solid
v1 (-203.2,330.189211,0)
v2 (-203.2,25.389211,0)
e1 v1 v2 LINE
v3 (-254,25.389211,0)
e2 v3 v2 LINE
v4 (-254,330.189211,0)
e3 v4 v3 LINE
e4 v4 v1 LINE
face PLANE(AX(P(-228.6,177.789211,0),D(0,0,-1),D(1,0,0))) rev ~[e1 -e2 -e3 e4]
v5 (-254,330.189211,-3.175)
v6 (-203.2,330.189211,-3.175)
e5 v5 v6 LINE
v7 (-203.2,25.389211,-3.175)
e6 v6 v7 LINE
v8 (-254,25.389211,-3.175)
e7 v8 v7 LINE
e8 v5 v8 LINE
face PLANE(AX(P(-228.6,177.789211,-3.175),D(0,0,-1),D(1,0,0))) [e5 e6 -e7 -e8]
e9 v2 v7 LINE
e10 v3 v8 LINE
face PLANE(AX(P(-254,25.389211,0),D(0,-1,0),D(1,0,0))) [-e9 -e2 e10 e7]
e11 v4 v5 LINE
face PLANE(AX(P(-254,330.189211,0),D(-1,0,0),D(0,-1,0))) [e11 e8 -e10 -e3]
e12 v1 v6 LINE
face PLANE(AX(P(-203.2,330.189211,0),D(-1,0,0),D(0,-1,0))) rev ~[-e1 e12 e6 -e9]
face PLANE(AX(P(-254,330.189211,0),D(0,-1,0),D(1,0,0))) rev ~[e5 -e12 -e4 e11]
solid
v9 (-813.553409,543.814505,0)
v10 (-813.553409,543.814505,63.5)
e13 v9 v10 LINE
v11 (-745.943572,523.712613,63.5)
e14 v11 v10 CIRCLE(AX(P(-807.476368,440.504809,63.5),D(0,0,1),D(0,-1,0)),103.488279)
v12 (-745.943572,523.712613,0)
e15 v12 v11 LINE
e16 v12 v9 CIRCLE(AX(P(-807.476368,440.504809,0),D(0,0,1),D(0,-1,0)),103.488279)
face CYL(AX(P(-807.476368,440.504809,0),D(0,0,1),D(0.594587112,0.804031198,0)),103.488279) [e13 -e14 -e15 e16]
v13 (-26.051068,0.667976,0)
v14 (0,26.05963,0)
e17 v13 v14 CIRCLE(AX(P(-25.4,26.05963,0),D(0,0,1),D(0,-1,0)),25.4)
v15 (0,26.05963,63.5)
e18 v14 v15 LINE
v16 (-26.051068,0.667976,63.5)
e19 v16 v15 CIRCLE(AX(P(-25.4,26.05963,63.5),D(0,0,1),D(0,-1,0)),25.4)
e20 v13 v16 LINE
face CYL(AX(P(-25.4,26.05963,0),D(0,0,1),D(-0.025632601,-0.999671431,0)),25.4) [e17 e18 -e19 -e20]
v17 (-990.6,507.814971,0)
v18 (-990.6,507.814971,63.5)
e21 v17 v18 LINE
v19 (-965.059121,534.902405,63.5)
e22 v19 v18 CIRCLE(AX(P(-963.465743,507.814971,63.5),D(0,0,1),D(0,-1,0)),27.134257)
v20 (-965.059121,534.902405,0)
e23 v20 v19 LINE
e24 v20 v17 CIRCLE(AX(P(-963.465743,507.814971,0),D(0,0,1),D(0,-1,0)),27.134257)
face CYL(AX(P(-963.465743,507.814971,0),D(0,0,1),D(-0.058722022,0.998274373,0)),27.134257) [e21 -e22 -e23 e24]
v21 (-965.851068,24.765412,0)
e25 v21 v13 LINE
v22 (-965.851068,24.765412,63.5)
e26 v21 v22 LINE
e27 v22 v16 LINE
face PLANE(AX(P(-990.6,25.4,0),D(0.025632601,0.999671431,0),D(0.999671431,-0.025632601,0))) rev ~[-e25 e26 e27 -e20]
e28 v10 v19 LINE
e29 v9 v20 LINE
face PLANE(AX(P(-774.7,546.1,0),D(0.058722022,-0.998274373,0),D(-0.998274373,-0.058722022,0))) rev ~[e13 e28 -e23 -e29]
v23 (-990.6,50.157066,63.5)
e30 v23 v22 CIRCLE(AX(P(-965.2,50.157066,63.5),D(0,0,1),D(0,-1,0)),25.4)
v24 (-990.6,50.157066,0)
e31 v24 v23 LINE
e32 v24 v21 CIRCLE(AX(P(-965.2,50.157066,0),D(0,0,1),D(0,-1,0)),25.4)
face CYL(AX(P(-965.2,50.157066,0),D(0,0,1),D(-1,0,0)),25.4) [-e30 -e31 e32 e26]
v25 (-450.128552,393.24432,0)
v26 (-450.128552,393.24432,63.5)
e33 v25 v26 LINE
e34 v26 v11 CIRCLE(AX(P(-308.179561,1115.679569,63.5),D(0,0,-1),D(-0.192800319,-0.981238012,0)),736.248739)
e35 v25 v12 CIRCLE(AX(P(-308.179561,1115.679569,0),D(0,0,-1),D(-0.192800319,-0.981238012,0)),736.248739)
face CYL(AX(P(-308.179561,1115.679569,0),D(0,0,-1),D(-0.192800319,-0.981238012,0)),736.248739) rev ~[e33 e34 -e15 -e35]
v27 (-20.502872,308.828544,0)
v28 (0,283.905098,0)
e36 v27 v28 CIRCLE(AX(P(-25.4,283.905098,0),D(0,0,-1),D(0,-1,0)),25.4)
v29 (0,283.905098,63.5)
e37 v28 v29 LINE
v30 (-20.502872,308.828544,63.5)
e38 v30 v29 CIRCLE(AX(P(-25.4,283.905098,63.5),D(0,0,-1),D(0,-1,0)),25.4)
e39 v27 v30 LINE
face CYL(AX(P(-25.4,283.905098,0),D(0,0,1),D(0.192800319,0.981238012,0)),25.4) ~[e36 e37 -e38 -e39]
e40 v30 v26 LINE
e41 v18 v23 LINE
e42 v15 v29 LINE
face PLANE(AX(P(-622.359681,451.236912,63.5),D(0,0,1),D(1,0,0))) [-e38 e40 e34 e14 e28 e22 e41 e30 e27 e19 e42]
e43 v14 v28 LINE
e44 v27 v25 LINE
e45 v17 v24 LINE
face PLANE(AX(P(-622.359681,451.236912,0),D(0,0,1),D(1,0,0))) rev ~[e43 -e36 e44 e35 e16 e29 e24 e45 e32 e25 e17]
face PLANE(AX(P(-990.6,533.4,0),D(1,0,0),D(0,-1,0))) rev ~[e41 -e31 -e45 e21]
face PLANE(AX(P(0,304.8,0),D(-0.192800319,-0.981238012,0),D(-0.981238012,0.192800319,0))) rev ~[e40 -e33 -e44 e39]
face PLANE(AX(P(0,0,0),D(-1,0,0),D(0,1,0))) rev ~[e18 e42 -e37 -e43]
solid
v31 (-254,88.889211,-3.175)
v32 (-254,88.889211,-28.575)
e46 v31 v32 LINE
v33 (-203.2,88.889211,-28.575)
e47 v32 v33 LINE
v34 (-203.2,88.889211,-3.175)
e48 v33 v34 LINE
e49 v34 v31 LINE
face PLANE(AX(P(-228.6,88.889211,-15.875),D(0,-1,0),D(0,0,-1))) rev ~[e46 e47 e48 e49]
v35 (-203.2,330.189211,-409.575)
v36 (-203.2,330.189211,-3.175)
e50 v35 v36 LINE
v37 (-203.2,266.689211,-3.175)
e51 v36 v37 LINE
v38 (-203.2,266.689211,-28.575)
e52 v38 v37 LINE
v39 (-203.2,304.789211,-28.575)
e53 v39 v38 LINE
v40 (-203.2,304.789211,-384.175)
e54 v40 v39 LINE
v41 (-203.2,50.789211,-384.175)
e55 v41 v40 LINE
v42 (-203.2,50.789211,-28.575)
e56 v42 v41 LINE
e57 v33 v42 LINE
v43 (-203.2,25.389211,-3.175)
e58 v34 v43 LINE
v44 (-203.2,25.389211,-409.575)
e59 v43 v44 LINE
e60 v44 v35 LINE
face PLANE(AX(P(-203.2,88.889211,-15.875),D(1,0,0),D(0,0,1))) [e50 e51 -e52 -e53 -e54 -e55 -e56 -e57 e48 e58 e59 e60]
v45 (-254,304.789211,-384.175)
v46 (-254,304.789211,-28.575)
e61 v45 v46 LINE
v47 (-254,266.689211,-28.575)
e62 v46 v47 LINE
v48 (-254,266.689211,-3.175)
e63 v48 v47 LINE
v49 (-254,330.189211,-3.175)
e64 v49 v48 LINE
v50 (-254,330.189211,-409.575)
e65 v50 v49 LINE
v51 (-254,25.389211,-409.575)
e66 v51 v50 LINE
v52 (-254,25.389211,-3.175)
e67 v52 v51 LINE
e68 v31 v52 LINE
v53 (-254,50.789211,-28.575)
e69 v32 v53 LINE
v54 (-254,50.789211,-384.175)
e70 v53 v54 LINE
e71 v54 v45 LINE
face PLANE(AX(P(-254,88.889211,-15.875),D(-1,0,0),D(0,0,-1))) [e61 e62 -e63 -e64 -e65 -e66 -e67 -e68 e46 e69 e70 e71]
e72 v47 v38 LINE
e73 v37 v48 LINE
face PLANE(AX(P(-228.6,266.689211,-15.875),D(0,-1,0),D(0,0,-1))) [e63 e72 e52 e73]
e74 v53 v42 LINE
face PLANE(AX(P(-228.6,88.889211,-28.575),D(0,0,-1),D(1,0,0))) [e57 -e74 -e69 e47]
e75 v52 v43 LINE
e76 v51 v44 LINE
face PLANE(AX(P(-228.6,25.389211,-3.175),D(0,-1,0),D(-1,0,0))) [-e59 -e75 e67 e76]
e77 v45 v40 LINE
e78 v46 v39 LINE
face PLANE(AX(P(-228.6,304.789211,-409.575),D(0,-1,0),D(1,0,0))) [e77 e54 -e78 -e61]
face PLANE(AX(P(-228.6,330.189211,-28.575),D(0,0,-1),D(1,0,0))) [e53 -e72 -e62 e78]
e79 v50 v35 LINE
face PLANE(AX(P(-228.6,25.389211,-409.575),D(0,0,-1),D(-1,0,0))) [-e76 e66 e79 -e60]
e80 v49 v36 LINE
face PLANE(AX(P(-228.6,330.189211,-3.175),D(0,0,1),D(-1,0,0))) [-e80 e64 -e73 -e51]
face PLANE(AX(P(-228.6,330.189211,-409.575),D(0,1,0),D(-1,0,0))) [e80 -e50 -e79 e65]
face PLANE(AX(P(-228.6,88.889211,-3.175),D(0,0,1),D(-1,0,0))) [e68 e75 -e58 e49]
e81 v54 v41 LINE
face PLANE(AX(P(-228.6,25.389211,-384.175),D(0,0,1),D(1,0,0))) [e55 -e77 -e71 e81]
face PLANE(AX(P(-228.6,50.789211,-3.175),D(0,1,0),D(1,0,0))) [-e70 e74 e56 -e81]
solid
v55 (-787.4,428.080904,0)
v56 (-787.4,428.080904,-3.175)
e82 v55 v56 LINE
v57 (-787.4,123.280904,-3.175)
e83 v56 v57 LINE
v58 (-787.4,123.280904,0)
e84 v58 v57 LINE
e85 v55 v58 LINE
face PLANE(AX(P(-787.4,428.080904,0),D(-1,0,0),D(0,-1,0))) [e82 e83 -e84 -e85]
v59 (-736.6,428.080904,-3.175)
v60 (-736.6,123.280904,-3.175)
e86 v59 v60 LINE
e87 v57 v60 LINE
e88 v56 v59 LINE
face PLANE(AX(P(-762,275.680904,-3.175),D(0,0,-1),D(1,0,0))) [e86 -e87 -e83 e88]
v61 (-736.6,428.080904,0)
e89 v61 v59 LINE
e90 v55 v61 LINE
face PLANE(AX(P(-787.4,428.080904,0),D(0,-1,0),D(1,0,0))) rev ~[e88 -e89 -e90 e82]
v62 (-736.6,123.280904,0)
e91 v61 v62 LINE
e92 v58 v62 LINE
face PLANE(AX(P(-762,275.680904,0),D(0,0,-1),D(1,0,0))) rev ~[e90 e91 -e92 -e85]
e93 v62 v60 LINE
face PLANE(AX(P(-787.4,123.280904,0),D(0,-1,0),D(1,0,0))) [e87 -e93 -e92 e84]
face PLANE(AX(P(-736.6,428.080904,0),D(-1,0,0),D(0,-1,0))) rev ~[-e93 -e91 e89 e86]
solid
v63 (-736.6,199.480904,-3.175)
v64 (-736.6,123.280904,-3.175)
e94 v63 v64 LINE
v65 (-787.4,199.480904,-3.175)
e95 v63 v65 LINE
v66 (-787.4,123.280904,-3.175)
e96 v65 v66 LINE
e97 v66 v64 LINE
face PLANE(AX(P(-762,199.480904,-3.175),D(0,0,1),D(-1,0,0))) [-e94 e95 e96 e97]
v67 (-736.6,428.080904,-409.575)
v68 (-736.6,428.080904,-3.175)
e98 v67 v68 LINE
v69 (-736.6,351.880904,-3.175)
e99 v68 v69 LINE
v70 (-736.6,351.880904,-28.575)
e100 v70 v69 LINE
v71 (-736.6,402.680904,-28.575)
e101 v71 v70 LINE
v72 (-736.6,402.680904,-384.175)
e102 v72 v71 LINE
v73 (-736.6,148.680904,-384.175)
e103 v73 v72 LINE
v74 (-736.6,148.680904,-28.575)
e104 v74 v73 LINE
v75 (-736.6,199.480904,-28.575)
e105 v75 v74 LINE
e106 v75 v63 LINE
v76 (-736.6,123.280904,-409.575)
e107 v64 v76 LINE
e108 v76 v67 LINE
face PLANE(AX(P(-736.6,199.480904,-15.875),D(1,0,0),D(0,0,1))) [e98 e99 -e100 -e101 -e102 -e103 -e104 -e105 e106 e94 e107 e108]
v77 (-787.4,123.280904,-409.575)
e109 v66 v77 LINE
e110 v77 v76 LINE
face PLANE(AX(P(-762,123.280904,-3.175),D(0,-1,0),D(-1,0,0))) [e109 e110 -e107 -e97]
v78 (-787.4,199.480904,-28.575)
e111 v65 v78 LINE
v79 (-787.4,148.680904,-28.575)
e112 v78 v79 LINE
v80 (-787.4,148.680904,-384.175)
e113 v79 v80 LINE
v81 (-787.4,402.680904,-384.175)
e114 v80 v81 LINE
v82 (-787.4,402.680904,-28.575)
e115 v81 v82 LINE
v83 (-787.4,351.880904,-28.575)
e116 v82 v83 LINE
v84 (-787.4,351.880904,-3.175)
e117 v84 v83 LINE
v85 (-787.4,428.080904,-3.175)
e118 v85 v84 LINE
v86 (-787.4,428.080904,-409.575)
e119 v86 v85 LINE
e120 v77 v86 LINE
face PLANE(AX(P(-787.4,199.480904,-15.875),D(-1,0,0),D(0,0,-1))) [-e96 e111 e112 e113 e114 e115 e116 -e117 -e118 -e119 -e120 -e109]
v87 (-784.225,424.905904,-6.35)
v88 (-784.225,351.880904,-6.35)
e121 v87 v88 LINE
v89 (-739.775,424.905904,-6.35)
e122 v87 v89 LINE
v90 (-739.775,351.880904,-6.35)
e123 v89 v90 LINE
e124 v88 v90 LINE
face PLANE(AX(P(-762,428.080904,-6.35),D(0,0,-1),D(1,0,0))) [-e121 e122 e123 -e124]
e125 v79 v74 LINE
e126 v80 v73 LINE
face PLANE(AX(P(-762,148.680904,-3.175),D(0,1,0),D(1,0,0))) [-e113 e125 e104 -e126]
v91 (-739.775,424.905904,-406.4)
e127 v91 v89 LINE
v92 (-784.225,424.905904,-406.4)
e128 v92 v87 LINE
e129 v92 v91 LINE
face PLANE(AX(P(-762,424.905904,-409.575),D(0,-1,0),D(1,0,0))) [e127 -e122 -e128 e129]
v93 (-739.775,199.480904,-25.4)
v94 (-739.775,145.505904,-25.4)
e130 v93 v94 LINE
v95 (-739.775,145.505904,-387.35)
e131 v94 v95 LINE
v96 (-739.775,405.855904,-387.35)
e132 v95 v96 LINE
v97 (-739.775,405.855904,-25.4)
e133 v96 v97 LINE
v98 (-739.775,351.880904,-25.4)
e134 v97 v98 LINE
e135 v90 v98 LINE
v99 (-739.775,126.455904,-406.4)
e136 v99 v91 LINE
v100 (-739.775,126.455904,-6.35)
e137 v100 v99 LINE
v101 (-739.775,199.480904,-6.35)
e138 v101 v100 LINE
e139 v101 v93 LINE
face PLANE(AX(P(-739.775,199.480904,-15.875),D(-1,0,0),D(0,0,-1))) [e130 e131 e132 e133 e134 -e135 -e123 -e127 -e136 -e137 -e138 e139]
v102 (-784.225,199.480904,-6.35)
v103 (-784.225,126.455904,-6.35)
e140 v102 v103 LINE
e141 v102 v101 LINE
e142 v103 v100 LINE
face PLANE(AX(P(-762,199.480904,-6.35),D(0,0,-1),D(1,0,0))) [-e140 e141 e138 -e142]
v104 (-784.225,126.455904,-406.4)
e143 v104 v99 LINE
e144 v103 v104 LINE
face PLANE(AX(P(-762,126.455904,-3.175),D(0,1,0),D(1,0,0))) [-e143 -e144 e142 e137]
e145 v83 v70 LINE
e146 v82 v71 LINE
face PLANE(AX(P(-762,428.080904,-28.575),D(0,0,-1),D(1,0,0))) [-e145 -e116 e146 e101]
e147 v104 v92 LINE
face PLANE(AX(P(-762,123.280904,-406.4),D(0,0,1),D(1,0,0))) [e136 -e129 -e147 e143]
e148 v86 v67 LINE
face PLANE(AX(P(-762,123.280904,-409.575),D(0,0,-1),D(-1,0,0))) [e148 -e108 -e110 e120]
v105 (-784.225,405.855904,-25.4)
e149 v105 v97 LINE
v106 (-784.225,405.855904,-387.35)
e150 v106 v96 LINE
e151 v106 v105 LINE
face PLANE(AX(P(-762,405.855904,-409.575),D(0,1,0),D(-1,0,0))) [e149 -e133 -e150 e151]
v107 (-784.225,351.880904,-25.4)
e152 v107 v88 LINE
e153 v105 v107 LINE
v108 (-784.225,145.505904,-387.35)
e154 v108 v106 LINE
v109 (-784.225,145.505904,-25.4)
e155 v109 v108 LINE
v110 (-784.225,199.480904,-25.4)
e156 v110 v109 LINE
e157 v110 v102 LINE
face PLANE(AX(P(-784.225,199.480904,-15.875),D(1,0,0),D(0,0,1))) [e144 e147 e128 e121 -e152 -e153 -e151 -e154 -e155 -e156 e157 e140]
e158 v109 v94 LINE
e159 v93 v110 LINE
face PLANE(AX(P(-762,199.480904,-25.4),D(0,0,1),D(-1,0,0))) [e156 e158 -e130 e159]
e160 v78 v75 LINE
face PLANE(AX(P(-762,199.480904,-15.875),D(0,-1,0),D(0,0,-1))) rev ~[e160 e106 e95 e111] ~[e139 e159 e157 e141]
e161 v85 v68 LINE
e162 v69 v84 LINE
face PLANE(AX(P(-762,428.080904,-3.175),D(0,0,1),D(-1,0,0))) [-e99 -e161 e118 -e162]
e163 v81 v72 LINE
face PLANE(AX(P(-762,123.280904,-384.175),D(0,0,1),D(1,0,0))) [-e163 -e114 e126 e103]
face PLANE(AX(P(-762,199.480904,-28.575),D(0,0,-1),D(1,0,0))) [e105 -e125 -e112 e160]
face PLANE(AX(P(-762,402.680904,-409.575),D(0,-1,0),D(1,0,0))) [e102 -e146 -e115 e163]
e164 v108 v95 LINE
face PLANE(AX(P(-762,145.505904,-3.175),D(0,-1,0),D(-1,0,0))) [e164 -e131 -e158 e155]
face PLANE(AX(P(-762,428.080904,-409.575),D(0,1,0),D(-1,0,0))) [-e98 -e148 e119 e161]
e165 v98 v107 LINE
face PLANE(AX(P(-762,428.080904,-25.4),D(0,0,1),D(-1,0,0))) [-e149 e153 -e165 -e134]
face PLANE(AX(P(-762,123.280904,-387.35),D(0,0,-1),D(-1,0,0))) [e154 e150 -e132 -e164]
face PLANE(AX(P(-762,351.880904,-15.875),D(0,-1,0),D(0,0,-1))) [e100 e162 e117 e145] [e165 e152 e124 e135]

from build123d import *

# Parameters (mm, degrees)
F1_DEPTH    = 63.5
F3_T1_DEPTH = 63.5
F2_W        = 50.8
F2_H        = 304.8
F4_DEPTH    = 3.175
F7_W        = 50.8
F7_H        = 25.4
F7_W_2      = 44.45
F7_H_2      = 19.05
F11_W       = 50.8
F11_H       = 25.4
F13_R       = 103.4882786099
F14_R       = 27.1342571694
F15_R       = 25.4


# Not quite as in the source:
# - a fillet or chamfer that OpenCascade refuses, or shapes differently, is made with other operations: its cross-section is extruded or revolved along the edge and cut away or added


with BuildPart() as f1:
    # F0 (on Top) → F1 (new body)
    with BuildSketch(Plane.XY):
        Polygon((-990.6, 25.4), (0, 0), (0, 304.8), (-678.6715388298, 438.15), (-774.7, 546.1), (-990.6, 533.4), align=None)
    extrude(amount=F1_DEPTH)

    # F3: fillet of radius 736.2487387041 on 1 edges, made by hand

    # F3_s2 → F3_t1 (join)
    with BuildSketch(Plane.XY):
        with BuildLine():
            ThreePointArc((-450.1285521095, 393.2443195118), (-621.8672665328, 449.5998222637), (-774.7, 546.1))
            Line((-774.7, 546.1), (-678.6715388298, 438.15))
            Line((-678.6715388298, 438.15), (-450.1285521095, 393.2443195118))
        make_face()
    extrude(amount=F3_T1_DEPTH)

    # F13
    f13_edges = [f1.edges().sort_by_distance(p)[0] for p in [
        (-774.7, 546.1, 31.75),
    ]]
    fillet(f13_edges, radius=F13_R)

    # F14
    f14_edges = [f1.edges().sort_by_distance(p)[0] for p in [
        (-990.6, 533.4, 31.75),
    ]]
    fillet(f14_edges, radius=F14_R)

    # F15
    f15_edges = [f1.edges().sort_by_distance(p)[0] for p in [
        (-990.6, 25.4, 31.75),
        (0, 0, 31.75),
        (0, 304.8, 31.75),
    ]]
    fillet(f15_edges, radius=F15_R)


with BuildPart() as f4:
    # F2 (on face) → F4 (new body)
    with BuildSketch(Plane(origin=(0, 0, 0), x_dir=(1, 0, 0), z_dir=(0, 0, -1))):
        with Locations((-228.6, -177.7892106534)):
            Rectangle(F2_W, F2_H)
    extrude(amount=F4_DEPTH)


with BuildPart() as f4b:
    # F2 (on face) → F4, piece 2 (new body)
    with BuildSketch(Plane(origin=(0, 0, 0), x_dir=(1, 0, 0), z_dir=(0, 0, -1))):
        with Locations((-762, -275.6809043643)):
            Rectangle(F2_W, F2_H)
    extrude(amount=F4_DEPTH)


with BuildPart() as f8:
    # F8: sweep along a path in F5
    with BuildLine(Plane(origin=(-787.4, 0, 0), x_dir=(0, -1, 0), z_dir=(-1, 0, 0))) as f8_path:
        Line((-199.4809043643, -3.175), (-123.2809043643, -3.175))
        Line((-123.2809043643, -3.175), (-123.2809043643, -409.575))
        Line((-123.2809043643, -409.575), (-428.0809043643, -409.575))
        Line((-428.0809043643, -409.575), (-428.0809043643, -3.175))
        Line((-428.0809043643, -3.175), (-351.8809043643, -3.175))
    # F7 (on line) → F8 (sweep)
    with BuildSketch(Plane.XZ.offset(-351.8809043643)):
        with Locations((-762, -15.875)):
            Rectangle(F7_W, F7_H)
        with Locations((-762, -15.875)):
            Rectangle(F7_W_2, F7_H_2, mode=Mode.SUBTRACT)
    sweep(path=f8_path.line, transition=Transition.RIGHT)


with BuildPart() as f12:
    # F12: sweep along a path in F9
    with BuildLine(Plane.YZ.offset(-203.2)) as f12_path:
        Line((88.8892106534, -3.175), (25.3892106534, -3.175))
        Line((25.3892106534, -3.175), (25.3892106534, -409.575))
        Line((25.3892106534, -409.575), (330.1892106534, -409.575))
        Line((330.1892106534, -409.575), (330.1892106534, -3.175))
        Line((330.1892106534, -3.175), (266.6892106534, -3.175))
    # F11 (on line) → F12 (sweep)
    with BuildSketch(Plane.XZ.offset(-88.8892106534)):
        with Locations((-228.6, -15.875)):
            Rectangle(F11_W, F11_H)
    sweep(path=f12_path.line, transition=Transition.RIGHT)


solid = Compound([f1.part, f4.part, f4b.part, f8.part, f12.part])
